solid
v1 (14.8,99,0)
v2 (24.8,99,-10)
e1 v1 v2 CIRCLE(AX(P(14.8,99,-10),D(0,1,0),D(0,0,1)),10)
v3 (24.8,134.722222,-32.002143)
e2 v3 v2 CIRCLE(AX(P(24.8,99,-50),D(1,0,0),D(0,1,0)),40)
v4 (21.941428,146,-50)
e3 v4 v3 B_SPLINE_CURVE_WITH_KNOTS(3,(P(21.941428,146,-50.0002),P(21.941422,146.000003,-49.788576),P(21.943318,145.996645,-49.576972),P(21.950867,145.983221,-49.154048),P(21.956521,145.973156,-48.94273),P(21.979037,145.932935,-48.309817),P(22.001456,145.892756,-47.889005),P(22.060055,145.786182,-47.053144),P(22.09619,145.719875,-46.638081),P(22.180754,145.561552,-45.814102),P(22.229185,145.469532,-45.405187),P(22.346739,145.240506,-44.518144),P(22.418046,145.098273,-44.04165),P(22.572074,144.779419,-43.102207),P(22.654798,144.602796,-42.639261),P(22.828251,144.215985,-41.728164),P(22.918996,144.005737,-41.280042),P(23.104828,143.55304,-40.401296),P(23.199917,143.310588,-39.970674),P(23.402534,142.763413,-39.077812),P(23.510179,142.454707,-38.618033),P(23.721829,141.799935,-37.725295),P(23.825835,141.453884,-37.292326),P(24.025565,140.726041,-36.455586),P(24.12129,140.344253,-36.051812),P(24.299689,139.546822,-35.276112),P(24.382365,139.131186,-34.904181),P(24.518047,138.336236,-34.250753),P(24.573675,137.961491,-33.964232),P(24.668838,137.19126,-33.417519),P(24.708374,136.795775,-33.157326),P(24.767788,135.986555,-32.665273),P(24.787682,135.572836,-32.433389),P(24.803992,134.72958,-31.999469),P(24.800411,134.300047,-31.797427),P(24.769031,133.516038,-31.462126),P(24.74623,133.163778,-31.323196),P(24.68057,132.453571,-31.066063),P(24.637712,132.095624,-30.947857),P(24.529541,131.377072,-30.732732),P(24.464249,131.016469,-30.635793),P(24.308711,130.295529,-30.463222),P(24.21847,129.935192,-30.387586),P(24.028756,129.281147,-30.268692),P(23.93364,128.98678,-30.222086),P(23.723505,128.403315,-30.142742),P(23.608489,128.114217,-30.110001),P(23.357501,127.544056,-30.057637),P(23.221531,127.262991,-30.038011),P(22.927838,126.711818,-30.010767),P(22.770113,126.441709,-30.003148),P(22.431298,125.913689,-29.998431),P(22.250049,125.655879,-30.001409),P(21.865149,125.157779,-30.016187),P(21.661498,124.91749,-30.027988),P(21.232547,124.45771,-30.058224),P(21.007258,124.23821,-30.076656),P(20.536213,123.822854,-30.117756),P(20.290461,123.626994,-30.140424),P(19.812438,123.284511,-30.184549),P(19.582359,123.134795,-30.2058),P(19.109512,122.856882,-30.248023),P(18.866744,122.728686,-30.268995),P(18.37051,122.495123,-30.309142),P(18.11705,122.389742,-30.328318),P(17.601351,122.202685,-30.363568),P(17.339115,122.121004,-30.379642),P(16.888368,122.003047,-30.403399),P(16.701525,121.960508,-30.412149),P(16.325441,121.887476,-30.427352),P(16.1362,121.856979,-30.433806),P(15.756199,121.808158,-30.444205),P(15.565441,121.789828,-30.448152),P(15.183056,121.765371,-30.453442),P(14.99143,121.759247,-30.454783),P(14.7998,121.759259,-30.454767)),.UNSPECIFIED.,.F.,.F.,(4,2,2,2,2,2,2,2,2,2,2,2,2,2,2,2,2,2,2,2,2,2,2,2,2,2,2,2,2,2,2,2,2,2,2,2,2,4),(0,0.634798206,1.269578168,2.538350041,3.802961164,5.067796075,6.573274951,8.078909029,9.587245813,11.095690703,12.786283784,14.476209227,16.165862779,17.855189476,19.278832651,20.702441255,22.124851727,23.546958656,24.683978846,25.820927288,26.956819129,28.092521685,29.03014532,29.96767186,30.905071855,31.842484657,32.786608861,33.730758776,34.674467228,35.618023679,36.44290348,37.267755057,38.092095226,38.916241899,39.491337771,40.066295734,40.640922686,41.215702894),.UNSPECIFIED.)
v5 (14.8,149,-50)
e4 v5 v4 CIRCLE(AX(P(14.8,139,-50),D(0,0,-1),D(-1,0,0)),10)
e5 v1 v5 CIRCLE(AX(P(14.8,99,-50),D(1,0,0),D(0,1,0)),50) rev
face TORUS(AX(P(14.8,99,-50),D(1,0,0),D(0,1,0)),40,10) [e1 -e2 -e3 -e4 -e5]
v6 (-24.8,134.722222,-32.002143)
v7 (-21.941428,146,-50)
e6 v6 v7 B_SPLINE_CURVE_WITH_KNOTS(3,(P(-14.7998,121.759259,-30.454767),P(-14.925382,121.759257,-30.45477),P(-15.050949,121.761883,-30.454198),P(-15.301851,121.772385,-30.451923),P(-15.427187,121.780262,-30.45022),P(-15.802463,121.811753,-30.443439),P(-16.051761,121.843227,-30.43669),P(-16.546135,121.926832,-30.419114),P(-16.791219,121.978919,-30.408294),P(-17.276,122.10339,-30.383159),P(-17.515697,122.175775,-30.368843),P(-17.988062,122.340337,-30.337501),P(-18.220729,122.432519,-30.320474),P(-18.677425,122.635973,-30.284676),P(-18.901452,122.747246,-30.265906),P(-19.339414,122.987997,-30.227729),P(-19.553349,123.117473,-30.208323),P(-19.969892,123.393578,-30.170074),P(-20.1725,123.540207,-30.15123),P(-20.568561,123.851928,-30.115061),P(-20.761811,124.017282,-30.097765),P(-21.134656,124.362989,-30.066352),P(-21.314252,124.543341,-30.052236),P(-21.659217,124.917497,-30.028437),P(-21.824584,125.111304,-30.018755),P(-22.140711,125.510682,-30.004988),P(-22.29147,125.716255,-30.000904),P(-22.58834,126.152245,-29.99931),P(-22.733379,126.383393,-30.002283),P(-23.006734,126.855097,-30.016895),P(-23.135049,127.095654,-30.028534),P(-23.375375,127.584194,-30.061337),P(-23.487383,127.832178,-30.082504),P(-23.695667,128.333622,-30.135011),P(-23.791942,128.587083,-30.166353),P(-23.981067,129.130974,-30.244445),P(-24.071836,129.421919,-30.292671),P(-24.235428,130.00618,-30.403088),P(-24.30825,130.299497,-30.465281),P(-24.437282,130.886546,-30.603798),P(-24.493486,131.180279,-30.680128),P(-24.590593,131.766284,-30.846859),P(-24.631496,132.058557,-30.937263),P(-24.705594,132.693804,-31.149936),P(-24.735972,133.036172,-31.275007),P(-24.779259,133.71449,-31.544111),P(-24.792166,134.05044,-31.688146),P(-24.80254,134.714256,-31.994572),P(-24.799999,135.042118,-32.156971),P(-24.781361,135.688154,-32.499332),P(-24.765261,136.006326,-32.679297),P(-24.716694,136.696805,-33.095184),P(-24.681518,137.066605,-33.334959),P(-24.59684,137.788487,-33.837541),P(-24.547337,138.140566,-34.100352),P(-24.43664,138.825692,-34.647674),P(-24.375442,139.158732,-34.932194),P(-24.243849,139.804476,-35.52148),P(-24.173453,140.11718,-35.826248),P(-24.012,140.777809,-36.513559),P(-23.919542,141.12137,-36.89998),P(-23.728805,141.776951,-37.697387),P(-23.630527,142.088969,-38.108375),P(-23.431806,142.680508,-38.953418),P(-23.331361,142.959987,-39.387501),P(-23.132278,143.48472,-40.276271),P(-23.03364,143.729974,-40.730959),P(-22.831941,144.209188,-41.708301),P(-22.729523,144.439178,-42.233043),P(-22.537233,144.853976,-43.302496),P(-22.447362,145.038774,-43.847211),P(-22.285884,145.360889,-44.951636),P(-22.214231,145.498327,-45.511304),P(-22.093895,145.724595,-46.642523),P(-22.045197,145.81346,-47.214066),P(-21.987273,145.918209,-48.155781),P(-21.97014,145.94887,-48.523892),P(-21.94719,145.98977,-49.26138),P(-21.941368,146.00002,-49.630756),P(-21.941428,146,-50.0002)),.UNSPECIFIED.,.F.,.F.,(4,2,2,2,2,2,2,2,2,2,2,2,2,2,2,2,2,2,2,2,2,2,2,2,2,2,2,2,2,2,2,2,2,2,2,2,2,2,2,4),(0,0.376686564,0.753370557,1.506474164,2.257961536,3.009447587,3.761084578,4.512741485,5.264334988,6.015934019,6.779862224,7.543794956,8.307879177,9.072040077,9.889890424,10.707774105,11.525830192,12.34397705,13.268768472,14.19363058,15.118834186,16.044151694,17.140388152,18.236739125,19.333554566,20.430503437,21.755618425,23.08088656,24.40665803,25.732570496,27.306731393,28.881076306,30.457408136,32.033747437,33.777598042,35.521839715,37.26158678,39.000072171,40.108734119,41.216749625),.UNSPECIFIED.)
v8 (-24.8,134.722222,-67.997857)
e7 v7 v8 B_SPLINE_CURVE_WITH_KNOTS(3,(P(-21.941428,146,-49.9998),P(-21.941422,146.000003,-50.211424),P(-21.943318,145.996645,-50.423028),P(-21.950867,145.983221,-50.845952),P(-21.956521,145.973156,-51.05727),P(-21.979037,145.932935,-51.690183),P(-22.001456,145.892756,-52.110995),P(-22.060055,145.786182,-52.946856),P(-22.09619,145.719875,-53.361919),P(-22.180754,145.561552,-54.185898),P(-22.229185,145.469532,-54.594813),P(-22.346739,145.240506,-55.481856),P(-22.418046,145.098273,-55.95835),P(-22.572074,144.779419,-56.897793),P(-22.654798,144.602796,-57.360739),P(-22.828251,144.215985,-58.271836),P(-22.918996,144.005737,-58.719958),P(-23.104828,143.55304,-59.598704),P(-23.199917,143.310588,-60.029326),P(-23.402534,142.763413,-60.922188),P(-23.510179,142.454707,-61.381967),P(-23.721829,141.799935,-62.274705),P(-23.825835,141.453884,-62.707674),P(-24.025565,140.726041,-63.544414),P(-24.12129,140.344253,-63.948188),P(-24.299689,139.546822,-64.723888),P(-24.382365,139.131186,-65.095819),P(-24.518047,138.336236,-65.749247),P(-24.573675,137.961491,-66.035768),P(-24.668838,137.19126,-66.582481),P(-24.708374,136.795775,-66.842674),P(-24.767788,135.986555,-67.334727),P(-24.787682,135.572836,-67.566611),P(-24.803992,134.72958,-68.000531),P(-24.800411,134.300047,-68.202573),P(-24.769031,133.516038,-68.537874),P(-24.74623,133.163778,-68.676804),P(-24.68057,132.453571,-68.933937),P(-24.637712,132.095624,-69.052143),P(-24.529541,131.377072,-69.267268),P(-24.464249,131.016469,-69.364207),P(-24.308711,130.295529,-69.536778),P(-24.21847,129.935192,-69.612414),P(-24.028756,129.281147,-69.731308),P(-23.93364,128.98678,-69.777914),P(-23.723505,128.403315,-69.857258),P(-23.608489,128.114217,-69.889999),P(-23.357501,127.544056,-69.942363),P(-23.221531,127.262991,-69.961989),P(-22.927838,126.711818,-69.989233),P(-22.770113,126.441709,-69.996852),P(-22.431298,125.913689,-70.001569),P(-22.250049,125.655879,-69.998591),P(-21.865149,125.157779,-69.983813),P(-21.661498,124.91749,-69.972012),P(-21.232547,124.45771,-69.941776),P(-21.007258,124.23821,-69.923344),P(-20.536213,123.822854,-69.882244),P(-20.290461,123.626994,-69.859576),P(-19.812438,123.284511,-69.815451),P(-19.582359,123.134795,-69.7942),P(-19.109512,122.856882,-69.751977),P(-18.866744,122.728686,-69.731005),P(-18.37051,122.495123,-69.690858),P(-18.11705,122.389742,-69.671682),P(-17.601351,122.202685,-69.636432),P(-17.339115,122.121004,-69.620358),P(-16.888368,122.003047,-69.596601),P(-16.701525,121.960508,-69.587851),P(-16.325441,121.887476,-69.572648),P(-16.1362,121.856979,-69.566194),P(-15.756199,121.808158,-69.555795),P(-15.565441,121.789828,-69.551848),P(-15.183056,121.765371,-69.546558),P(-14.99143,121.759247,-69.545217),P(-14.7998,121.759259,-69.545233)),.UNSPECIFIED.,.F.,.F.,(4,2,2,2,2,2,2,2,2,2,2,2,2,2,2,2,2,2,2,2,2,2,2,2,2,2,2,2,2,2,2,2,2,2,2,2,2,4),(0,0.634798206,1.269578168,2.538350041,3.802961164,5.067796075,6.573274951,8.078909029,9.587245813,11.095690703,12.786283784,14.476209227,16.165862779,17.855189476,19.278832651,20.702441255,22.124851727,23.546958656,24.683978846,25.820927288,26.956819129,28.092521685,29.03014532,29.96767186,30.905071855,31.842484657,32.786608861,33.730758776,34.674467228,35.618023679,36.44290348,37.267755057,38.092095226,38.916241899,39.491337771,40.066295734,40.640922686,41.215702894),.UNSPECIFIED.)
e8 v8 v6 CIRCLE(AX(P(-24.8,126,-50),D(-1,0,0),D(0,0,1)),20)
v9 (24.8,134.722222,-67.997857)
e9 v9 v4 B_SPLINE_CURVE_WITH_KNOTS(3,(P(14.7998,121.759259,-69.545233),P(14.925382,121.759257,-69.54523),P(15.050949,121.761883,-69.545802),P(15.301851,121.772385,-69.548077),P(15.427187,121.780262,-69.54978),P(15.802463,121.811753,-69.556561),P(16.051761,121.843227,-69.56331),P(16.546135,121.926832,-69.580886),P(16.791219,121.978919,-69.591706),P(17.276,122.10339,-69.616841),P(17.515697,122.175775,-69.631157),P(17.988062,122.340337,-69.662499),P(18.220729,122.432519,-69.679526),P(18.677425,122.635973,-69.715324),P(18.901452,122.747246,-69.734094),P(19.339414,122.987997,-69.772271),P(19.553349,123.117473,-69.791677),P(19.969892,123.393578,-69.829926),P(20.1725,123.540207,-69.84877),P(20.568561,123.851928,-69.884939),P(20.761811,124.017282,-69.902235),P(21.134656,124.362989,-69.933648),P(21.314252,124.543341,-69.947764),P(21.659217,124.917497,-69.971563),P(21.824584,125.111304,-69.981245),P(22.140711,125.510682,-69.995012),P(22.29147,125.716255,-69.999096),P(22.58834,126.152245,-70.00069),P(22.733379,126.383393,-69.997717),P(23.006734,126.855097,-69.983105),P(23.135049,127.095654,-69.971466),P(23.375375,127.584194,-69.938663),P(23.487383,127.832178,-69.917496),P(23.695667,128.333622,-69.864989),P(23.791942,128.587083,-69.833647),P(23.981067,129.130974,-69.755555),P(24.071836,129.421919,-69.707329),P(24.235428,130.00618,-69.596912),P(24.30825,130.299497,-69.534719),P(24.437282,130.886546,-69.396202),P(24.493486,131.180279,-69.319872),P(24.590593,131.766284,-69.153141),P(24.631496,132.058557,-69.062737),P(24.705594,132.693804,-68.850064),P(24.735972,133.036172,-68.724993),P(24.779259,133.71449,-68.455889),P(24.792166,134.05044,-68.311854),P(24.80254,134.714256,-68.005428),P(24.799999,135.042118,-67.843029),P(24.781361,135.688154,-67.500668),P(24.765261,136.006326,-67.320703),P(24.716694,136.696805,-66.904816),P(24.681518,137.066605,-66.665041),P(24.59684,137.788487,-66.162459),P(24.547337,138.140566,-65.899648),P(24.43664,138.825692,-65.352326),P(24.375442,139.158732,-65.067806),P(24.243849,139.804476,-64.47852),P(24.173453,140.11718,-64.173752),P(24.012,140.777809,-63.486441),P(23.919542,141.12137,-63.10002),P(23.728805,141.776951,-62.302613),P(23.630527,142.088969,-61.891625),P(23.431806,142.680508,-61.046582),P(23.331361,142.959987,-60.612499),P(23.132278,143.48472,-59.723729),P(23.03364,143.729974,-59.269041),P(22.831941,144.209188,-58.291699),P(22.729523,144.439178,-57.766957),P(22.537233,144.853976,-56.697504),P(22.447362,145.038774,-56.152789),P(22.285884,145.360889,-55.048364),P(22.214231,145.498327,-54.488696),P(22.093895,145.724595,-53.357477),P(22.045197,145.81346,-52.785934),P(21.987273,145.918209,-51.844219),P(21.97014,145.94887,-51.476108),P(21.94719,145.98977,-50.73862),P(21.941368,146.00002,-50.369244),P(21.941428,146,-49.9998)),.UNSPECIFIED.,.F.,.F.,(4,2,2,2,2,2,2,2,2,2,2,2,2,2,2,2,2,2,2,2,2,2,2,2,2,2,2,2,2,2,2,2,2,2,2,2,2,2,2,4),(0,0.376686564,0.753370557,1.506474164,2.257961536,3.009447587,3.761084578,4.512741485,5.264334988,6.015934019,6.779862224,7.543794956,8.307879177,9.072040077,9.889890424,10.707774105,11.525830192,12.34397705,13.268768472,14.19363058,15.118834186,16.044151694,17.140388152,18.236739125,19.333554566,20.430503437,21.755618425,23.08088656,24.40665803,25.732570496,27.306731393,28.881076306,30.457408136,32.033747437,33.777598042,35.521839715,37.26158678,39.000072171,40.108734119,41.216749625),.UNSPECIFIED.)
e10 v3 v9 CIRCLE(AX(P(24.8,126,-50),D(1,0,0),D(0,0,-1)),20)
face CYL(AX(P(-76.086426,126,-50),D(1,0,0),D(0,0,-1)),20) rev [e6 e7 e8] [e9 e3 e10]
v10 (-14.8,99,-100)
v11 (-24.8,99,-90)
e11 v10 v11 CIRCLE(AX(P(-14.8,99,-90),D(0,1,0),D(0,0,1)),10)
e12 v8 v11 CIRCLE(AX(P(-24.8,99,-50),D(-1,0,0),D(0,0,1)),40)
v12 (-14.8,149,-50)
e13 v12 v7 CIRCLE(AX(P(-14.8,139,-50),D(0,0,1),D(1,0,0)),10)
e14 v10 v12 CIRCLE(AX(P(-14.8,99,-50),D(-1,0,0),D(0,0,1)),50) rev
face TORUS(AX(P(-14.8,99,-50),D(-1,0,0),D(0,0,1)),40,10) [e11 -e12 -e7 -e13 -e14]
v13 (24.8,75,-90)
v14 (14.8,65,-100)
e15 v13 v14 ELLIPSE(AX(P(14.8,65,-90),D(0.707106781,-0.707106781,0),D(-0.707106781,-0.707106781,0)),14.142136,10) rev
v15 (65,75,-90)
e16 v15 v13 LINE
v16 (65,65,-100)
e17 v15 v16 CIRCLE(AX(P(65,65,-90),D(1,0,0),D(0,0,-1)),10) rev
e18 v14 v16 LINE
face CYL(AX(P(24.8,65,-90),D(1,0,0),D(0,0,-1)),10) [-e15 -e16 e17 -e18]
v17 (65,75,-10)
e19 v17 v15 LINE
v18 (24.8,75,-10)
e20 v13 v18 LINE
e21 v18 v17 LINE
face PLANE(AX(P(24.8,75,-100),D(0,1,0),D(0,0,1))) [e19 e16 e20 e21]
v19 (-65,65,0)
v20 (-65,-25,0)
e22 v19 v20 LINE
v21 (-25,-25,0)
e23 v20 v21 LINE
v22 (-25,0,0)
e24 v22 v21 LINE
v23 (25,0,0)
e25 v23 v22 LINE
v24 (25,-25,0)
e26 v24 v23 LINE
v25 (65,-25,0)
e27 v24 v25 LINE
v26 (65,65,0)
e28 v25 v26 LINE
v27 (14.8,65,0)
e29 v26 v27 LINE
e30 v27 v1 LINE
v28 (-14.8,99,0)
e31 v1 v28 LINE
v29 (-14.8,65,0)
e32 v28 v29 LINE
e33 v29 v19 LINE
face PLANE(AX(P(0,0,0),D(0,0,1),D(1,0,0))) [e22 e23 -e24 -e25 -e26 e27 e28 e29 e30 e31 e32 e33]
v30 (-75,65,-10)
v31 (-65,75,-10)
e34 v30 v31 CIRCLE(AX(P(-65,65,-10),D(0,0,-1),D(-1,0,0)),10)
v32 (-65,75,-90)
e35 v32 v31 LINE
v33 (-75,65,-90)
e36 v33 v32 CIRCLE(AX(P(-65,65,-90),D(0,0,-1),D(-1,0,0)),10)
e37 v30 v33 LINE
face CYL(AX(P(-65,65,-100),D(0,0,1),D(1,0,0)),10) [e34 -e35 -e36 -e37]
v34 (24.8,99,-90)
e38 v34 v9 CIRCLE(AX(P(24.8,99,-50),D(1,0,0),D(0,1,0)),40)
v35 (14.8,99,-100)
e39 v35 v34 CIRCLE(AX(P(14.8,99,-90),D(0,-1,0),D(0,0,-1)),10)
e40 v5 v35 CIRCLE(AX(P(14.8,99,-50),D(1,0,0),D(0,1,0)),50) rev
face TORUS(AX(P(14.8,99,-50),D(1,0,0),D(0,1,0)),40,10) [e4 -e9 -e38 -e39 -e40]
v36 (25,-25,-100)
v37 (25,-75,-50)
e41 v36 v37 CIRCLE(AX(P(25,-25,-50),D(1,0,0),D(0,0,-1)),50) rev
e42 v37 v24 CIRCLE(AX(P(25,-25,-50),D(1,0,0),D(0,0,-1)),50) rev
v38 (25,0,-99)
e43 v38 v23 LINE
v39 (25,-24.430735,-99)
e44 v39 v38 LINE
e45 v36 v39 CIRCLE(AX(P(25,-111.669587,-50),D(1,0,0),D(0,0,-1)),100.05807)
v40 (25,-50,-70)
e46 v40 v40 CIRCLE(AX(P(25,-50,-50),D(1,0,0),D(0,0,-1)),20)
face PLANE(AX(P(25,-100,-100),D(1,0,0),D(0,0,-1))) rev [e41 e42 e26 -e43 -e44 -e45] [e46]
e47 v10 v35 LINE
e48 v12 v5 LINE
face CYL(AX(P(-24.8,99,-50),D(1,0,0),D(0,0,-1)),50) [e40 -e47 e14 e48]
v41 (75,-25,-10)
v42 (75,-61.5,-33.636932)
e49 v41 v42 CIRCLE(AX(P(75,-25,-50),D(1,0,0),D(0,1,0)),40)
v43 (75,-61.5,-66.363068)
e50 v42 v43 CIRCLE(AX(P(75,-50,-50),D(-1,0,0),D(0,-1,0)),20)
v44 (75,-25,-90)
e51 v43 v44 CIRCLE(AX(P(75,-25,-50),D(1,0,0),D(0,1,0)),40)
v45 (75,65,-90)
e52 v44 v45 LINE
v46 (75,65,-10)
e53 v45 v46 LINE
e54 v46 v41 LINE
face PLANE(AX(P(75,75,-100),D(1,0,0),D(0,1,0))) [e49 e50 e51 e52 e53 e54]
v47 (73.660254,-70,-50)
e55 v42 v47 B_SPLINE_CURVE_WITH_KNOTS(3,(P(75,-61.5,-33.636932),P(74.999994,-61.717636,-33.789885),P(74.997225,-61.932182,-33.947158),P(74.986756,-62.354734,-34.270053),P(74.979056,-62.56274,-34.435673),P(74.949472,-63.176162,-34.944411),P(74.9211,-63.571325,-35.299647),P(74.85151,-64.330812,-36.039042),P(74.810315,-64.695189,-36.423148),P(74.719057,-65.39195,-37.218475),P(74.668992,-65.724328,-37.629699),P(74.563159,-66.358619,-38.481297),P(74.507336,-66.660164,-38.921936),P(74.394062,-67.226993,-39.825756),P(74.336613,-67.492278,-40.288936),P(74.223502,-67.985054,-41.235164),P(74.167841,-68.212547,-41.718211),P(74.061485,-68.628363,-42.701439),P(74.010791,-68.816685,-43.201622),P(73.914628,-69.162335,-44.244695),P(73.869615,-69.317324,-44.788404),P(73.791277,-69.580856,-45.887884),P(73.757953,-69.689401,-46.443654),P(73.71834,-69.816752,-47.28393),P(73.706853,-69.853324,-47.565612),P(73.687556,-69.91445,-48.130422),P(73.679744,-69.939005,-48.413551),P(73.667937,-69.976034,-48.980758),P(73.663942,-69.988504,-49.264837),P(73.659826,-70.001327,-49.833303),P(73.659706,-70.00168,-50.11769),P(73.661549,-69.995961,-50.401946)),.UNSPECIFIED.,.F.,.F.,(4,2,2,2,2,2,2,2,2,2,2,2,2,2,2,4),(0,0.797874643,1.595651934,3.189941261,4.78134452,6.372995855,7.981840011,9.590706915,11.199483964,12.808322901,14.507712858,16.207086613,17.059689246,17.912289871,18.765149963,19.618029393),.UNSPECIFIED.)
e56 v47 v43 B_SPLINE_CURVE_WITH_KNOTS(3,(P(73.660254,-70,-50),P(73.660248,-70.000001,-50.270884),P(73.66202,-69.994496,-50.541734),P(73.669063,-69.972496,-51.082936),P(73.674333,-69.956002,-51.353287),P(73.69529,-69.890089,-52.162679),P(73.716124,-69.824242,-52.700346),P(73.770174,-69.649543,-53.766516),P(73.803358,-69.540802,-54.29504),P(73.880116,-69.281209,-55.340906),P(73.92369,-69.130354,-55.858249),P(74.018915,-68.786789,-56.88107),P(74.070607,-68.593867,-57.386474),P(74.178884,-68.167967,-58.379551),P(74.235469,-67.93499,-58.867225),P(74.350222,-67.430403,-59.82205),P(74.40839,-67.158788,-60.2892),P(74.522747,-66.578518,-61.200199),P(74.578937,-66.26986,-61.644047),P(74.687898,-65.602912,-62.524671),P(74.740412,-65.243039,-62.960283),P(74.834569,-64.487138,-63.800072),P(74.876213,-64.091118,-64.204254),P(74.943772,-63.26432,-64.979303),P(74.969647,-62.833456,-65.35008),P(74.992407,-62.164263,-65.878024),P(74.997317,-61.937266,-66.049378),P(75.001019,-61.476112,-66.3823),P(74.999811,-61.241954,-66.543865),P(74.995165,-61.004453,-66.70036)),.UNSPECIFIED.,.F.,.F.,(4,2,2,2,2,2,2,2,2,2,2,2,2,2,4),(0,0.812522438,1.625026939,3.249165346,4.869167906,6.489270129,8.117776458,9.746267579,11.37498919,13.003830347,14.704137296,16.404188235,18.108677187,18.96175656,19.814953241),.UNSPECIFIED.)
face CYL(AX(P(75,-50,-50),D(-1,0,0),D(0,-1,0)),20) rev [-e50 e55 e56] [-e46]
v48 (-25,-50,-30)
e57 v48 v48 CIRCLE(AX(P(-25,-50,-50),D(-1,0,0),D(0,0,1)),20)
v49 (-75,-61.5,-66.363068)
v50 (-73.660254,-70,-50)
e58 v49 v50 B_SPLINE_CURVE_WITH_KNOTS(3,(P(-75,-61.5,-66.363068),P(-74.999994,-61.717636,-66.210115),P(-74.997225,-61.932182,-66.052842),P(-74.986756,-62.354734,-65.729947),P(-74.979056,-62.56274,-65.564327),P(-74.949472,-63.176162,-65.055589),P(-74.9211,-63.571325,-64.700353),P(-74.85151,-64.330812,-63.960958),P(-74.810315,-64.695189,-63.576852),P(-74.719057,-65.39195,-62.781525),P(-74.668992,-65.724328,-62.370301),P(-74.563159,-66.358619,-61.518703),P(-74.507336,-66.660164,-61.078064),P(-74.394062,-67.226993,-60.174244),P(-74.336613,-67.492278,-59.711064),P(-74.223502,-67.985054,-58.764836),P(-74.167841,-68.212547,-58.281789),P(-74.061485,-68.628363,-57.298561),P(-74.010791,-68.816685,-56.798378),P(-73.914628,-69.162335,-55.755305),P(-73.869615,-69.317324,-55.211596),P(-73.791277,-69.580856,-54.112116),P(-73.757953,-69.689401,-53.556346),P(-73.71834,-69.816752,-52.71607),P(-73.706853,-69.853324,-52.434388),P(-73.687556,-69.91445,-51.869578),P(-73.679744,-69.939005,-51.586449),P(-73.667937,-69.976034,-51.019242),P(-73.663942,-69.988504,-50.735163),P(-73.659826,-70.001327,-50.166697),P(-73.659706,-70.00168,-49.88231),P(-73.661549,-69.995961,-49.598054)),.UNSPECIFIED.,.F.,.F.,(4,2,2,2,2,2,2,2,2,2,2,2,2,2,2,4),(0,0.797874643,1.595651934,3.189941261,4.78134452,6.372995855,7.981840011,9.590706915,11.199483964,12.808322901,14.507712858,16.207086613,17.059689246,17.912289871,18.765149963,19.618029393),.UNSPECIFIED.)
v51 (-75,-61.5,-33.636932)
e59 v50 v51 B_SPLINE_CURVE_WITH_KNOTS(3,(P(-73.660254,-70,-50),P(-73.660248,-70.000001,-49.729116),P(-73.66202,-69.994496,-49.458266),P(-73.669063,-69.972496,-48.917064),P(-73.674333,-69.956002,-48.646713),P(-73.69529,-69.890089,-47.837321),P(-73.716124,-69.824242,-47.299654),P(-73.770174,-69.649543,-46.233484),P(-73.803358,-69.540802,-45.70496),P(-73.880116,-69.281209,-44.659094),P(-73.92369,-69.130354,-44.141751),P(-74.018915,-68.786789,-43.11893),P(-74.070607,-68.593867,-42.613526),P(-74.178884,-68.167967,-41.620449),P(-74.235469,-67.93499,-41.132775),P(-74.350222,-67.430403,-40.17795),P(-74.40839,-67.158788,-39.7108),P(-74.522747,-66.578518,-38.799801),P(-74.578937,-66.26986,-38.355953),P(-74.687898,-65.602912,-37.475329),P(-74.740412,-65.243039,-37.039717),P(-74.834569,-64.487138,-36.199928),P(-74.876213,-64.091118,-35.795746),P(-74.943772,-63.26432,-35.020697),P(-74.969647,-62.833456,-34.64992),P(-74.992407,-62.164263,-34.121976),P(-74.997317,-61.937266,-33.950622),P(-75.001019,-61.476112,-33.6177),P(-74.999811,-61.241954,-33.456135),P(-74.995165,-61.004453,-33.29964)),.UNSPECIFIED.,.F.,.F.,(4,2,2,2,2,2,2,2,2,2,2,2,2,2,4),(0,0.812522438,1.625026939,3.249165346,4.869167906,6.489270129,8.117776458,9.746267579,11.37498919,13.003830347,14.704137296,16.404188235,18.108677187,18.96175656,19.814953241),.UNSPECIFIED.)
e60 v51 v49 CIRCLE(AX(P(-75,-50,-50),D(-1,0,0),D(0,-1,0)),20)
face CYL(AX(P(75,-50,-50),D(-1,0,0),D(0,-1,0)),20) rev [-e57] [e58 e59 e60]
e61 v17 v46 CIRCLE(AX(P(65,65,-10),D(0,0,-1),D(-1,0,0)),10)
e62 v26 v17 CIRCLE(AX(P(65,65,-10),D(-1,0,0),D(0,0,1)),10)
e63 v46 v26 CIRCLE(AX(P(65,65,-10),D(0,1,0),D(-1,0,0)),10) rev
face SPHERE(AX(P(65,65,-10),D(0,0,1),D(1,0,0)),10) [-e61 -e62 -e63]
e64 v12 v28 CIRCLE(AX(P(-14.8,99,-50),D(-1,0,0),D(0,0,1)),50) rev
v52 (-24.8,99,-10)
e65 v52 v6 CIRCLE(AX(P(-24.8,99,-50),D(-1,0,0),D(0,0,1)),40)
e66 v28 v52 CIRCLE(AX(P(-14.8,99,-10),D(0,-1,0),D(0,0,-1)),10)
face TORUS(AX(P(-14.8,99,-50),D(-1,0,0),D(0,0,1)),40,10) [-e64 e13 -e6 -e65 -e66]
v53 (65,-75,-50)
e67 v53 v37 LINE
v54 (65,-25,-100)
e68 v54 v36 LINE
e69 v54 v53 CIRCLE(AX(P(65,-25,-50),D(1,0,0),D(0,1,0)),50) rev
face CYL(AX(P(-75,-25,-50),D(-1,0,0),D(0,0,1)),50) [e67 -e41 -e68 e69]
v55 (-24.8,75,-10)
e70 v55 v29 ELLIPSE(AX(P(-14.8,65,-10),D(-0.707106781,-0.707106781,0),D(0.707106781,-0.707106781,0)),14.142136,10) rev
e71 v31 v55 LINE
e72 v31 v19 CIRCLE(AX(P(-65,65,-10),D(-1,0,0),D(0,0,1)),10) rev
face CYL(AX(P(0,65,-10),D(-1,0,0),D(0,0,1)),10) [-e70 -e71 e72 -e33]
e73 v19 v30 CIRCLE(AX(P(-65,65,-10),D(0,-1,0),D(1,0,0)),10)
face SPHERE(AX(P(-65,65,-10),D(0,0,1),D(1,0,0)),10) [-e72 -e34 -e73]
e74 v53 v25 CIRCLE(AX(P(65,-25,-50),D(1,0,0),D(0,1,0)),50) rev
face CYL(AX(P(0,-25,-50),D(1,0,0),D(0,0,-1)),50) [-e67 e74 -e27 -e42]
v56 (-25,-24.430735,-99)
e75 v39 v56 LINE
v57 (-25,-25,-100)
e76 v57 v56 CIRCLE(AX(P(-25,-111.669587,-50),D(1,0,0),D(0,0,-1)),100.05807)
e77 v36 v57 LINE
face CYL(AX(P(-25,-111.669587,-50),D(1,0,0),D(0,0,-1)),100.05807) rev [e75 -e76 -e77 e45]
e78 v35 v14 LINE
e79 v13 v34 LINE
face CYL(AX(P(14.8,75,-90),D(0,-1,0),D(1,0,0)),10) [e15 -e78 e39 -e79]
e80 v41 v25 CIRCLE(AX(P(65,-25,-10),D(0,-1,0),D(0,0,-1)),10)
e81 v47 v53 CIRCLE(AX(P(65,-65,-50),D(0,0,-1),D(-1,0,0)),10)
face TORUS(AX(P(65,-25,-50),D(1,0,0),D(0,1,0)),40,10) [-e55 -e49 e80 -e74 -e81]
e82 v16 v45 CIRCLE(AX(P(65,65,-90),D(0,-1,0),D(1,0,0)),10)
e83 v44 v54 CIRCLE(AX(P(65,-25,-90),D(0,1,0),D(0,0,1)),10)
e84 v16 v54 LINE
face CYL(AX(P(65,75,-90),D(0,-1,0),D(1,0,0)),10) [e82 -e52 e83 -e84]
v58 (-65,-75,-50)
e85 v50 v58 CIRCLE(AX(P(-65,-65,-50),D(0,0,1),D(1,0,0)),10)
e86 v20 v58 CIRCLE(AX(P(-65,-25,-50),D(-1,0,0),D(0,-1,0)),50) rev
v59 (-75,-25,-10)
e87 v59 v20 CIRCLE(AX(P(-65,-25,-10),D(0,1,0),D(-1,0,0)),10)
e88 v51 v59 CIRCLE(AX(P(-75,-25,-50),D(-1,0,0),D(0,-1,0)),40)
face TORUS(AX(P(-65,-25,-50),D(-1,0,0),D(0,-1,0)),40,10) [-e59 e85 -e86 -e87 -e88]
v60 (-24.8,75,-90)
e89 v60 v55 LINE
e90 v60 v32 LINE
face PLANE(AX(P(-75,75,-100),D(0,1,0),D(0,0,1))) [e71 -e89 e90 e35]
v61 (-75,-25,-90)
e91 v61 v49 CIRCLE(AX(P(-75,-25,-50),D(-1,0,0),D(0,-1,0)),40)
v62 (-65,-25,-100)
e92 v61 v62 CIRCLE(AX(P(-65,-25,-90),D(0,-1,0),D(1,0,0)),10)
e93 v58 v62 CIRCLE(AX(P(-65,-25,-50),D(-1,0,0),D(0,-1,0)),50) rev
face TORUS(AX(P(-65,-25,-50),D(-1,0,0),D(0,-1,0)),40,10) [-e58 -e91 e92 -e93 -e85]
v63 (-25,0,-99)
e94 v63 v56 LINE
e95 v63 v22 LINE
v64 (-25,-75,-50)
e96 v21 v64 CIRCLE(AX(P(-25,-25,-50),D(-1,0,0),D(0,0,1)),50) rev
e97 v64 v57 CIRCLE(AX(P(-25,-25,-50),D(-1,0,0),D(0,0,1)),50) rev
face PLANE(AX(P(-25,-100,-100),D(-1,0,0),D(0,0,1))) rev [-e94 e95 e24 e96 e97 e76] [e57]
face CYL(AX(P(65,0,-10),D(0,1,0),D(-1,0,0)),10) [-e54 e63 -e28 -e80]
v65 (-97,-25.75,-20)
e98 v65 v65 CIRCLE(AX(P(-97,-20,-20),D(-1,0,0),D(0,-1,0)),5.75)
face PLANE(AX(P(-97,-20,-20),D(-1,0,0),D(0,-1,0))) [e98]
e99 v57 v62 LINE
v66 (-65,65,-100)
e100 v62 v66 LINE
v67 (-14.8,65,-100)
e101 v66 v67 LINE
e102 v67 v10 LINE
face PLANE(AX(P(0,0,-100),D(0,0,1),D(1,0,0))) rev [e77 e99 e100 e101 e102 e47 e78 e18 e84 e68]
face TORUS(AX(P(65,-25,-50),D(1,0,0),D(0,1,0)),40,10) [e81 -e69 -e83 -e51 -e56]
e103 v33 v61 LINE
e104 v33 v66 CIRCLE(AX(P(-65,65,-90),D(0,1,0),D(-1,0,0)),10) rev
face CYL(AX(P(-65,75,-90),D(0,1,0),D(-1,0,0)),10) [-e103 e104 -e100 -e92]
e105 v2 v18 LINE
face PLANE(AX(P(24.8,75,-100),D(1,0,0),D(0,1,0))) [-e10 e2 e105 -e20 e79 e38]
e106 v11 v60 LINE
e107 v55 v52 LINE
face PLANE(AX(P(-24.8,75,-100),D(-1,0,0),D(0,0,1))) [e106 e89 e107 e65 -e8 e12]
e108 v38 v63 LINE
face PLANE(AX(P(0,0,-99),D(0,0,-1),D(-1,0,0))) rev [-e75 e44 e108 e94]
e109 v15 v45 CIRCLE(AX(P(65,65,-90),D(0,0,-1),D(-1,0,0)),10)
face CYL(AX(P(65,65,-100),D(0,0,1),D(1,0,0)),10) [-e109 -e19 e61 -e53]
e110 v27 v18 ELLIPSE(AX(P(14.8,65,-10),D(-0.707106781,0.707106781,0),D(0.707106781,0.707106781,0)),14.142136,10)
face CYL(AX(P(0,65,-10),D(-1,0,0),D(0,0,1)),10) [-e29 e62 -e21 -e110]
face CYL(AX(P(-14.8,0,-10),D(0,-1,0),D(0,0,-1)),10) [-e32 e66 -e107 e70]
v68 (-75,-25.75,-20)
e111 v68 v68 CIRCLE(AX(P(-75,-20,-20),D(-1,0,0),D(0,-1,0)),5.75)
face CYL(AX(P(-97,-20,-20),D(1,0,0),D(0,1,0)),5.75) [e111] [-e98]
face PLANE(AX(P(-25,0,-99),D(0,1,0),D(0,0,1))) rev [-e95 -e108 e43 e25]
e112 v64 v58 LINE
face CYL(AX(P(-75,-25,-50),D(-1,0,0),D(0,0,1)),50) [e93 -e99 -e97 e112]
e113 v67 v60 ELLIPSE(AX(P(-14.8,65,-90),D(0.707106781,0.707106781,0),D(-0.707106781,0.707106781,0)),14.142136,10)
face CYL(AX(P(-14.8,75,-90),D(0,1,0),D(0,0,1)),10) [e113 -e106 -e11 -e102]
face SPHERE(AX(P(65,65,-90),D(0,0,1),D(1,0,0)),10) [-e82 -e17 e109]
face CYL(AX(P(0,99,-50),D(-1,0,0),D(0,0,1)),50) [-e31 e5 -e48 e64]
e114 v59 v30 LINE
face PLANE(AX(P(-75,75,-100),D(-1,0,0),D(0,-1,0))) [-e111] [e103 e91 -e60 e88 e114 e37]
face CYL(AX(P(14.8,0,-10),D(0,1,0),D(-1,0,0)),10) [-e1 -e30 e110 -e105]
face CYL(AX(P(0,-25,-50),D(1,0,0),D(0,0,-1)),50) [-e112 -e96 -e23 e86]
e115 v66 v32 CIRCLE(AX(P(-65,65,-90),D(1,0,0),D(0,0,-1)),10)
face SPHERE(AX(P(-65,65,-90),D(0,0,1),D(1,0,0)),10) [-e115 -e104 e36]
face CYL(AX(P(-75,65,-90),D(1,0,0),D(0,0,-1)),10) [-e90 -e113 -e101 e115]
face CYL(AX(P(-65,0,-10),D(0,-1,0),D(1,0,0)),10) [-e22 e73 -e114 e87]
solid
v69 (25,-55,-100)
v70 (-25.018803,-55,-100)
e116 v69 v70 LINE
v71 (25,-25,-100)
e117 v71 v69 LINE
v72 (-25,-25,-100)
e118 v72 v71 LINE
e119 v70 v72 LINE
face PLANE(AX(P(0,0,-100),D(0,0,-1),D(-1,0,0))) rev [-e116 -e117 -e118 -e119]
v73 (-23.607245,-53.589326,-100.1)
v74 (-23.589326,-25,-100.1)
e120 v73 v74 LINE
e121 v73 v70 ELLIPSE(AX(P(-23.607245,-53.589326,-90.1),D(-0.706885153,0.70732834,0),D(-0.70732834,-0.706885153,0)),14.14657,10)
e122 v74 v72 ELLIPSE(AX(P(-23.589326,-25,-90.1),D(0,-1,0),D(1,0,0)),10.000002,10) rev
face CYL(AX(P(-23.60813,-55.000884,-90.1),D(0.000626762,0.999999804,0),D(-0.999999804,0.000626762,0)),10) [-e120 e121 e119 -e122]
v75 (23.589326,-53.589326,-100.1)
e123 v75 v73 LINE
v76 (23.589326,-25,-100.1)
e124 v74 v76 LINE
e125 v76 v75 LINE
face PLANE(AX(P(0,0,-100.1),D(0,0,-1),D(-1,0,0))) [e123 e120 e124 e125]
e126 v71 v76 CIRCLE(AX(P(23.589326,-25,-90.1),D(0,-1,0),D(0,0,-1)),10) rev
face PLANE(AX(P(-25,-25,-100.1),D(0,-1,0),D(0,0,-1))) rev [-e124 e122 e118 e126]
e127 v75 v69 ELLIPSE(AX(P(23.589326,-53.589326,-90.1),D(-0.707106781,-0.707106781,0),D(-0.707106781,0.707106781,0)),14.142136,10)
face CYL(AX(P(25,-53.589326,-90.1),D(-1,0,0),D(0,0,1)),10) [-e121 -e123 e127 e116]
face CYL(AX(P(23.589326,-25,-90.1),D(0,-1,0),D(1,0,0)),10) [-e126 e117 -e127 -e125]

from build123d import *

# Parameters (mm, degrees)
BOSS_EXTRUDE1_DEPTH    = 100
SKETCH2_W              = 50
SKETCH2_H              = 50
CUT_EXTRUDE1_DEPTH     = 195.489074243
FILLET1_R              = 50
CUT_EXTRUDE2_DEPTH     = 25
SKETCH7_R              = 20
CUT_EXTRUDE3_DEPTH     = 234.882449106
FILLET2_R              = 50
CUT_EXTRUDE6_START     = -75
CUT_EXTRUDE6_OUTLINE_W = 50
CUT_EXTRUDE6_OUTLINE_H = 6.698729811
CUT_EXTRUDE6_DEPTH     = 50
CUT_EXTRUDE7_DEPTH     = 25
FILLET3_R              = 10
SKETCH11_W             = 50
SKETCH11_H             = 25
CUT_EXTRUDE8_DEPTH     = 99
BOSS_EXTRUDE7_DEPTH    = 0.1
FILLET4_R              = 10
FILLET5_R              = 10
SKETCH14_R             = 20
CUT_EXTRUDE9_DEPTH     = 206.380257205
SKETCH15_R             = 5.75
BOSS_EXTRUDE8_DEPTH    = 22


with BuildPart() as part:
    # Sketch1 → Boss-Extrude1 (new body)
    with BuildSketch(Plane.XY):
        Polygon((-24.8, 75), (-24.8, 149), (24.8, 149), (24.8, 75), (75, 75), (75, -75), (-75, -75), (-75, 75), align=None)
    extrude(amount=-BOSS_EXTRUDE1_DEPTH)

    # Sketch2 → Cut-Extrude1 (cut, through all)
    with BuildSketch(Plane.XY):
        with Locations((0, -75)):
            Rectangle(SKETCH2_W, SKETCH2_H)
    extrude(amount=-CUT_EXTRUDE1_DEPTH, mode=Mode.SUBTRACT)

    # Fillet1
    fillet1_edges = [part.edges().sort_by_distance(p)[0] for p in [
        (0, 149, -100),
        (0, 149, 0),
    ]]
    fillet(fillet1_edges, radius=FILLET1_R - 0.0001)  # a hair under: the kernel refuses the full size

    # Sketch6 → Cut-Extrude2 (cut, symmetric)
    with BuildSketch(Plane(origin=(0, 0, 0), x_dir=(0, 0, -1), z_dir=(1, 0, 0))):
        with BuildLine():
            Line((100, -50), (0, -50))
            ThreePointArc((0, -50), (50, 0), (100, -50))
        make_face()
    extrude(amount=CUT_EXTRUDE2_DEPTH, both=True, mode=Mode.SUBTRACT)

    # Sketch7 → Cut-Extrude3 (cut, through all)
    with BuildSketch(Plane.ZY.offset(75)):
        with Locations(Location((-50, -50, 0), (0, 0, 270))):
            Circle(SKETCH7_R)
    extrude(amount=-CUT_EXTRUDE3_DEPTH, mode=Mode.SUBTRACT)

    # Fillet2
    fillet2_edges = [part.edges().sort_by_distance(p)[0] for p in [
        (-50, -75, -100),
        (-50, -75, 0),
    ]]
    fillet(fillet2_edges, radius=FILLET2_R - 0.0001)  # a hair under: the kernel refuses the full size

    # Cut-Extrude6: read off the stored shape, not the designer's step
    # Cut-Extrude6 outline → Cut-Extrude6 (cut)
    with BuildSketch(Plane(origin=(0, 0, 0), x_dir=(1, 0, 0), z_dir=(0, 1, 0)).offset(CUT_EXTRUDE6_START)):
        with Locations((0, 96.650635095)):
            Rectangle(CUT_EXTRUDE6_OUTLINE_W, CUT_EXTRUDE6_OUTLINE_H)
        with Locations((0, 3.349364906)):
            Rectangle(CUT_EXTRUDE6_OUTLINE_W, CUT_EXTRUDE6_OUTLINE_H)
    extrude(amount=CUT_EXTRUDE6_DEPTH, mode=Mode.SUBTRACT)

    # Sketch10 → Cut-Extrude7 (cut, symmetric)
    with BuildSketch(Plane(origin=(0, 0, 0), x_dir=(0, 0, -1), z_dir=(1, 0, 0))):
        with BuildLine():
            Line((0, -25), (100, -25))
            ThreePointArc((100, -25), (50, -11.611517322), (0, -25))
        make_face()
    extrude(amount=CUT_EXTRUDE7_DEPTH, both=True, mode=Mode.SUBTRACT)

    # Fillet3
    # the kernel refuses this fillet: 10 mm, written as the material it takes off along each edge
    with BuildSketch(Plane(origin=(24.8, 99.0001, -100), x_dir=(0, 0, 1), z_dir=(0, -1, 0)), Plane(origin=(-24.8, 75, 0), x_dir=(1, 0, 0), z_dir=(0, 1, 0)), Plane(origin=(-24.8, 75, -100), x_dir=(0, 0, 1), z_dir=(0, 1, 0)), Plane(origin=(24.8, 99.0001, 0), x_dir=(-1, 0, 0), z_dir=(0, -1, 0))) as fillet3_piece_1:
        with BuildLine():
            CenterArc((FILLET3_R, FILLET3_R), FILLET3_R, 180, 90)
            Line((0, FILLET3_R), (0, 0))
            Line((0, 0), (FILLET3_R, 0))
        make_face()
    extrude(amount=24.0001, mode=Mode.SUBTRACT)
    with BuildSketch(Plane(origin=(24.8, 75, 0), x_dir=(0, -1, 0), z_dir=(1, 0, 0)), Plane(origin=(-100, 75, -100), x_dir=(0, 0, 1), z_dir=(1, 0, 0)), Plane(origin=(24.8, 75, -100), x_dir=(0, 0, 1), z_dir=(1, 0, 0)), Plane(origin=(-100, 75, 0), x_dir=(0, -1, 0), z_dir=(1, 0, 0))) as fillet3_piece_2:
        with BuildLine():
            CenterArc((FILLET3_R, FILLET3_R), FILLET3_R, 180, 90)
            Line((0, FILLET3_R), (0, 0))
            Line((0, 0), (FILLET3_R, 0))
        make_face()
    extrude(amount=75.2, mode=Mode.SUBTRACT)
    with BuildSketch(Plane(origin=(-75, -25.0001, -100), x_dir=(0, 0, 1), z_dir=(0, 1, 0)), Plane(origin=(75, 100, 0), x_dir=(-1, 0, 0), z_dir=(0, -1, 0)), Plane(origin=(75, 100, -100), x_dir=(0, 0, 1), z_dir=(0, -1, 0)), Plane(origin=(-75, -25.0001, 0), x_dir=(1, 0, 0), z_dir=(0, 1, 0))) as fillet3_piece_3:
        with BuildLine():
            CenterArc((FILLET3_R, FILLET3_R), FILLET3_R, 180, 90)
            Line((0, FILLET3_R), (0, 0))
            Line((0, 0), (FILLET3_R, 0))
        make_face()
    extrude(amount=125.0001, mode=Mode.SUBTRACT)
    with BuildSketch(Plane(origin=(-24.8, 99.0001, -49.9999), x_dir=(0, 1, 0), z_dir=(0, 0, -1))) as fillet3_piece_4:
        with BuildLine():
            CenterArc((49.9999 - FILLET3_R, FILLET3_R), FILLET3_R, 270, 90)
            Line((49.9999 - FILLET3_R, 0), (49.9999, 0))
            Line((49.9999, 0), (49.9999, FILLET3_R))
        make_face()
    revolve(axis=Axis((-24.8, 99.0001, -49.9999), (1, 0, 0)), revolution_arc=90, mode=Mode.SUBTRACT)
    with BuildSketch(Plane(origin=(-24.8, 99.0001, -50.0001), x_dir=(0, 1, 0), z_dir=(0, 0, 1))) as fillet3_piece_5:
        with BuildLine():
            CenterArc((49.9999 - FILLET3_R, -FILLET3_R), FILLET3_R, 0, 90)
            Line((49.9999, -FILLET3_R), (49.9999, 0))
            Line((49.9999, 0), (49.9999 - FILLET3_R, 0))
        make_face()
    revolve(axis=Axis((-24.8, 99.0001, -50.0001), (-1, 0, 0)), revolution_arc=90, mode=Mode.SUBTRACT)
    with BuildSketch(Plane(origin=(24.8, 99.0001, -49.9999), x_dir=(0, 1, 0), z_dir=(0, 0, -1))) as fillet3_piece_6:
        with BuildLine():
            CenterArc((49.9999 - FILLET3_R, -FILLET3_R), FILLET3_R, 0, 90)
            Line((49.9999, -FILLET3_R), (49.9999, 0))
            Line((49.9999, 0), (49.9999 - FILLET3_R, 0))
        make_face()
    revolve(axis=Axis((24.8, 99.0001, -49.9999), (1, 0, 0)), revolution_arc=90, mode=Mode.SUBTRACT)
    with BuildSketch(Plane(origin=(24.8, 99.0001, -50.0001), x_dir=(0, 1, 0), z_dir=(0, 0, 1))) as fillet3_piece_7:
        with BuildLine():
            CenterArc((49.9999 - FILLET3_R, FILLET3_R), FILLET3_R, 270, 90)
            Line((49.9999, FILLET3_R), (49.9999, 0))
            Line((49.9999, 0), (49.9999 - FILLET3_R, 0))
        make_face()
    revolve(axis=Axis((24.8, 99.0001, -50.0001), (-1, 0, 0)), revolution_arc=90, mode=Mode.SUBTRACT)
    with BuildSketch(Plane(origin=(75, -25.0001, -49.9999), x_dir=(0, 0, 1), z_dir=(0, 1, 0))) as fillet3_piece_8:
        with BuildLine():
            CenterArc((49.9999 - FILLET3_R, -FILLET3_R), FILLET3_R, 0, 90)
            Line((49.9999, -FILLET3_R), (49.9999, 0))
            Line((49.9999, 0), (49.9999 - FILLET3_R, 0))
        make_face()
    revolve(axis=Axis((75, -25.0001, -49.9999), (1, 0, 0)), revolution_arc=90, mode=Mode.SUBTRACT)
    with BuildSketch(Plane(origin=(75, -25.0001, -50.0001), x_dir=(0, 0, -1), z_dir=(0, 1, 0))) as fillet3_piece_9:
        with BuildLine():
            CenterArc((49.9999 - FILLET3_R, FILLET3_R), FILLET3_R, 270, 90)
            Line((49.9999, FILLET3_R), (49.9999, 0))
            Line((49.9999, 0), (49.9999 - FILLET3_R, 0))
        make_face()
    revolve(axis=Axis((75, -25.0001, -50.0001), (-1, 0, 0)), revolution_arc=90, mode=Mode.SUBTRACT)
    with BuildSketch(Plane(origin=(-75, -25.0001, -49.9999), x_dir=(0, 0, 1), z_dir=(0, 1, 0))) as fillet3_piece_10:
        with BuildLine():
            CenterArc((49.9999 - FILLET3_R, FILLET3_R), FILLET3_R, 270, 90)
            Line((49.9999, FILLET3_R), (49.9999, 0))
            Line((49.9999, 0), (49.9999 - FILLET3_R, 0))
        make_face()
    revolve(axis=Axis((-75, -25.0001, -49.9999), (1, 0, 0)), revolution_arc=90, mode=Mode.SUBTRACT)
    with BuildSketch(Plane(origin=(-75, -25.0001, -50.0001), x_dir=(0, 0, -1), z_dir=(0, 1, 0))) as fillet3_piece_11:
        with BuildLine():
            CenterArc((49.9999 - FILLET3_R, -FILLET3_R), FILLET3_R, 0, 90)
            Line((49.9999, -FILLET3_R), (49.9999, 0))
            Line((49.9999, 0), (49.9999 - FILLET3_R, 0))
        make_face()
    revolve(axis=Axis((-75, -25.0001, -50.0001), (-1, 0, 0)), revolution_arc=90, mode=Mode.SUBTRACT)
    with BuildSketch(Plane(origin=(-75, -75, -49.9999), x_dir=(0, 1, 0), z_dir=(0, 0, -1)), Plane(origin=(24.8, 149, -49.9999), x_dir=(0, -1, 0), z_dir=(0, 0, -1))) as fillet3_piece_12:
        with BuildLine():
            CenterArc((FILLET3_R, FILLET3_R), FILLET3_R, 180, 90)
            Line((0, FILLET3_R), (0, 0))
            Line((0, 0), (FILLET3_R, 0))
        make_face()
    extrude(amount=0.0002, mode=Mode.SUBTRACT)
    with BuildSketch(Plane(origin=(75, -75, -49.9999), x_dir=(0, 1, 0), z_dir=(0, 0, -1)), Plane(origin=(-24.8, 149, -49.9999), x_dir=(0, -1, 0), z_dir=(0, 0, -1))) as fillet3_piece_13:
        with BuildLine():
            CenterArc((FILLET3_R, -FILLET3_R), FILLET3_R, 90, 90)
            Line((0, -FILLET3_R), (0, 0))
            Line((0, 0), (FILLET3_R, 0))
        make_face()
    extrude(amount=0.0002, mode=Mode.SUBTRACT)
    with BuildSketch(Plane(origin=(-0.2, 75, -100), x_dir=(0, 0, 1), z_dir=(1, 0, 0))) as fillet3_piece_14a_section:
        with BuildLine():
            CenterArc((FILLET3_R, FILLET3_R), FILLET3_R, 180, 90)
            Line((0, FILLET3_R), (0, 0))
            Line((0, 0), (FILLET3_R, 0))
        make_face()
    fillet3_piece_14a = extrude(amount=100.2, mode=Mode.PRIVATE)
    fillet3_piece_14a = split(fillet3_piece_14a, bisect_by=Plane(origin=(24.8, 75, -100), z_dir=(-1, 0, 0)), keep=Keep.TOP, mode=Mode.PRIVATE)
    with BuildSketch(Plane(origin=(24.8, 99.0001, -100), x_dir=(0, 0, 1), z_dir=(0, -1, 0))) as fillet3_piece_14b_section:
        with BuildLine():
            CenterArc((FILLET3_R, FILLET3_R), FILLET3_R, 180, 90)
            Line((0, FILLET3_R), (0, 0))
            Line((0, 0), (FILLET3_R, 0))
        make_face()
    fillet3_piece_14b = extrude(amount=49.0001, mode=Mode.PRIVATE)
    fillet3_piece_14b = split(fillet3_piece_14b, bisect_by=Plane(origin=(24.8, 75, -100), z_dir=(0, -1, 0)), keep=Keep.TOP, mode=Mode.PRIVATE)
    fillet3_piece_14 = fillet3_piece_14a & fillet3_piece_14b
    add(fillet3_piece_14, mode=Mode.SUBTRACT)
    with BuildSketch(Plane(origin=(-0.2, 75, 0), x_dir=(0, -1, 0), z_dir=(1, 0, 0))) as fillet3_piece_15a_section:
        with BuildLine():
            CenterArc((FILLET3_R, FILLET3_R), FILLET3_R, 180, 90)
            Line((0, FILLET3_R), (0, 0))
            Line((0, 0), (FILLET3_R, 0))
        make_face()
    fillet3_piece_15a = extrude(amount=100.2, mode=Mode.PRIVATE)
    fillet3_piece_15a = split(fillet3_piece_15a, bisect_by=Plane(origin=(24.8, 75, 0), z_dir=(-1, 0, 0)), keep=Keep.TOP, mode=Mode.PRIVATE)
    with BuildSketch(Plane(origin=(24.8, 99.0001, 0), x_dir=(-1, 0, 0), z_dir=(0, -1, 0))) as fillet3_piece_15b_section:
        with BuildLine():
            CenterArc((FILLET3_R, FILLET3_R), FILLET3_R, 180, 90)
            Line((0, FILLET3_R), (0, 0))
            Line((0, 0), (FILLET3_R, 0))
        make_face()
    fillet3_piece_15b = extrude(amount=49.0001, mode=Mode.PRIVATE)
    fillet3_piece_15b = split(fillet3_piece_15b, bisect_by=Plane(origin=(24.8, 75, 0), z_dir=(0, -1, 0)), keep=Keep.TOP, mode=Mode.PRIVATE)
    fillet3_piece_15 = fillet3_piece_15a & fillet3_piece_15b
    add(fillet3_piece_15, mode=Mode.SUBTRACT)
    with BuildSketch(Plane(origin=(-24.8, 50, -100), x_dir=(0, 0, 1), z_dir=(0, 1, 0))) as fillet3_piece_16a_section:
        with BuildLine():
            CenterArc((FILLET3_R, FILLET3_R), FILLET3_R, 180, 90)
            Line((0, FILLET3_R), (0, 0))
            Line((0, 0), (FILLET3_R, 0))
        make_face()
    fillet3_piece_16a = extrude(amount=49.0001, mode=Mode.PRIVATE)
    fillet3_piece_16a = split(fillet3_piece_16a, bisect_by=Plane(origin=(-24.8, 75, -100), z_dir=(0, -1, 0)), keep=Keep.TOP, mode=Mode.PRIVATE)
    with BuildSketch(Plane(origin=(-100, 75, -100), x_dir=(0, 0, 1), z_dir=(1, 0, 0))) as fillet3_piece_16b_section:
        with BuildLine():
            CenterArc((FILLET3_R, FILLET3_R), FILLET3_R, 180, 90)
            Line((0, FILLET3_R), (0, 0))
            Line((0, 0), (FILLET3_R, 0))
        make_face()
    fillet3_piece_16b = extrude(amount=100.2, mode=Mode.PRIVATE)
    fillet3_piece_16b = split(fillet3_piece_16b, bisect_by=Plane(origin=(-24.8, 75, -100), z_dir=(1, 0, 0)), keep=Keep.TOP, mode=Mode.PRIVATE)
    fillet3_piece_16 = fillet3_piece_16a & fillet3_piece_16b
    add(fillet3_piece_16, mode=Mode.SUBTRACT)
    with BuildSketch(Plane(origin=(-24.8, 50, 0), x_dir=(1, 0, 0), z_dir=(0, 1, 0))) as fillet3_piece_17a_section:
        with BuildLine():
            CenterArc((FILLET3_R, FILLET3_R), FILLET3_R, 180, 90)
            Line((0, FILLET3_R), (0, 0))
            Line((0, 0), (FILLET3_R, 0))
        make_face()
    fillet3_piece_17a = extrude(amount=49.0001, mode=Mode.PRIVATE)
    fillet3_piece_17a = split(fillet3_piece_17a, bisect_by=Plane(origin=(-24.8, 75, 0), z_dir=(0, -1, 0)), keep=Keep.TOP, mode=Mode.PRIVATE)
    with BuildSketch(Plane(origin=(-100, 75, 0), x_dir=(0, -1, 0), z_dir=(1, 0, 0))) as fillet3_piece_17b_section:
        with BuildLine():
            CenterArc((FILLET3_R, FILLET3_R), FILLET3_R, 180, 90)
            Line((0, FILLET3_R), (0, 0))
            Line((0, 0), (FILLET3_R, 0))
        make_face()
    fillet3_piece_17b = extrude(amount=100.2, mode=Mode.PRIVATE)
    fillet3_piece_17b = split(fillet3_piece_17b, bisect_by=Plane(origin=(-24.8, 75, 0), z_dir=(1, 0, 0)), keep=Keep.TOP, mode=Mode.PRIVATE)
    fillet3_piece_17 = fillet3_piece_17a & fillet3_piece_17b
    add(fillet3_piece_17, mode=Mode.SUBTRACT)

    # Sketch11 → Cut-Extrude8 (cut)
    with BuildSketch(Plane.XY):
        with Locations((0, -12.5)):
            Rectangle(SKETCH11_W, SKETCH11_H)
    extrude(amount=-CUT_EXTRUDE8_DEPTH, mode=Mode.SUBTRACT)

    # Fillet5
    # the kernel refuses this fillet: 10 mm, written as the material it takes off along each edge
    with BuildSketch(Plane(origin=(65, 65, -10), x_dir=(0, 1, 0), z_dir=(1, 0, 0))) as fillet5_piece_1_section:
        Polygon((0, 0), (FILLET5_R, 0), (FILLET5_R, FILLET5_R), (0, FILLET5_R), align=None)
    fillet5_piece_1 = extrude(amount=FILLET5_R, mode=Mode.PRIVATE)
    fillet5_piece_1 = fillet5_piece_1 - Plane(origin=(65, 65, -10), x_dir=(0, -0.7071067811865475, -0.7071067811865475), z_dir=(1, 0, 0)) * Sphere(FILLET5_R, mode=Mode.PRIVATE)
    add(fillet5_piece_1, mode=Mode.SUBTRACT)
    with BuildSketch(Plane(origin=(65, 65, -90), x_dir=(0, 1, 0), z_dir=(1, 0, 0))) as fillet5_piece_2_section:
        Polygon((0, 0), (FILLET5_R, 0), (FILLET5_R, -FILLET5_R), (0, -FILLET5_R), align=None)
    fillet5_piece_2 = extrude(amount=FILLET5_R, mode=Mode.PRIVATE)
    fillet5_piece_2 = fillet5_piece_2 - Plane(origin=(65, 65, -90), x_dir=(0, -0.7071067811865475, 0.7071067811865475), z_dir=(1, 0, 0)) * Sphere(FILLET5_R, mode=Mode.PRIVATE)
    add(fillet5_piece_2, mode=Mode.SUBTRACT)
    with BuildSketch(Plane(origin=(-65, 65, -90), x_dir=(0, 1, 0), z_dir=(-1, 0, 0))) as fillet5_piece_3_section:
        Polygon((0, 0), (FILLET5_R, 0), (FILLET5_R, FILLET5_R), (0, FILLET5_R), align=None)
    fillet5_piece_3 = extrude(amount=FILLET5_R, mode=Mode.PRIVATE)
    fillet5_piece_3 = fillet5_piece_3 - Plane(origin=(-65, 65, -90), x_dir=(0, -0.7071067811865475, 0.7071067811865475), z_dir=(-1, 0, 0)) * Sphere(FILLET5_R, mode=Mode.PRIVATE)
    add(fillet5_piece_3, mode=Mode.SUBTRACT)
    with BuildSketch(Plane(origin=(-65, 65, -10), x_dir=(0, 1, 0), z_dir=(-1, 0, 0))) as fillet5_piece_4_section:
        Polygon((0, 0), (FILLET5_R, 0), (FILLET5_R, -FILLET5_R), (0, -FILLET5_R), align=None)
    fillet5_piece_4 = extrude(amount=FILLET5_R, mode=Mode.PRIVATE)
    fillet5_piece_4 = fillet5_piece_4 - Plane(origin=(-65, 65, -10), x_dir=(0, -0.7071067811865475, -0.7071067811865475), z_dir=(-1, 0, 0)) * Sphere(FILLET5_R, mode=Mode.PRIVATE)
    add(fillet5_piece_4, mode=Mode.SUBTRACT)
    with BuildSketch(Plane(origin=(75, 75, -10), x_dir=(0, -1, 0), z_dir=(0, 0, -1))) as fillet5_piece_5:
        with BuildLine():
            CenterArc((FILLET5_R, FILLET5_R), FILLET5_R, 180, 90)
            Line((0, FILLET5_R), (0, 0))
            Line((0, 0), (FILLET5_R, 0))
        make_face()
    extrude(amount=80, mode=Mode.SUBTRACT)
    with BuildSketch(Plane(origin=(-75, 75, -10), x_dir=(0, -1, 0), z_dir=(0, 0, -1))) as fillet5_piece_6:
        with BuildLine():
            CenterArc((FILLET5_R, -FILLET5_R), FILLET5_R, 90, 90)
            Line((0, -FILLET5_R), (0, 0))
            Line((0, 0), (FILLET5_R, 0))
        make_face()
    extrude(amount=80, mode=Mode.SUBTRACT)

    # Sketch14 → Cut-Extrude9 (cut, through all)
    with BuildSketch(Plane(origin=(24.8, 0, 0), x_dir=(0, 0, -1), z_dir=(1, 0, 0))):
        with Locations(Location((50, 126, 0), (0, 0, 25.856016698))):
            Circle(SKETCH14_R)
    extrude(amount=-CUT_EXTRUDE9_DEPTH, mode=Mode.SUBTRACT)

    # Sketch15 → Boss-Extrude8 (add)
    with BuildSketch(Plane.ZY.offset(75)):
        with Locations(Location((-20, -20, 0), (0, 0, 270))):
            Circle(SKETCH15_R)
    extrude(amount=BOSS_EXTRUDE8_DEPTH)


with BuildPart() as body_2:
    # Sketch13 → Boss-Extrude7 (new body)
    with BuildSketch(Plane(origin=(0, 0, -100), x_dir=(-1, 0, 0), z_dir=(0, 0, -1))):
        Polygon((-25, -25), (-25, -55), (25.018802851, -55), (25, -25), align=None)
    extrude(amount=BOSS_EXTRUDE7_DEPTH)

    # Fillet4
    # the kernel refuses this fillet: 10 mm, written as the material it takes off along each edge
    with BuildSketch(Plane(origin=(-25.021013242, -58.526683302, -100.1), x_dir=(0, 0, 1), z_dir=(0.0006267615930632001, 0.9999998035849335, 0))) as fillet4_piece_1:
        with BuildLine():
            CenterArc((10, 1.410673598), FILLET4_R, 180, 8.109614456)
            Line((0, 1.410673598), (0, 0))
            Line((0, 0), (0.1, 0))
        make_face()
    extrude(amount=37.053373882, mode=Mode.SUBTRACT)
    with BuildSketch(Plane(origin=(25, -21.473316005, -100.1), x_dir=(0, 0, 1), z_dir=(0, -1, 0))) as fillet4_piece_2:
        with BuildLine():
            CenterArc((10, 1.410673598), FILLET4_R, 180, 8.109614456)
            Line((0, 1.410673598), (0, 0))
            Line((0, 0), (0.1, 0))
        make_face()
    extrude(amount=37.05336799, mode=Mode.SUBTRACT)
    with BuildSketch(Plane(origin=(28.526683995, -55, -100.1), x_dir=(0, 0, 1), z_dir=(-1, 0, 0))) as fillet4_piece_3:
        with BuildLine():
            CenterArc((10, 1.410673598), FILLET4_R, 180, 8.109614456)
            Line((0, 1.410673598), (0, 0))
            Line((0, 0), (0.1, 0))
        make_face()
    extrude(amount=57.072170841, mode=Mode.SUBTRACT)


solid = Compound([part.part, body_2.part])
